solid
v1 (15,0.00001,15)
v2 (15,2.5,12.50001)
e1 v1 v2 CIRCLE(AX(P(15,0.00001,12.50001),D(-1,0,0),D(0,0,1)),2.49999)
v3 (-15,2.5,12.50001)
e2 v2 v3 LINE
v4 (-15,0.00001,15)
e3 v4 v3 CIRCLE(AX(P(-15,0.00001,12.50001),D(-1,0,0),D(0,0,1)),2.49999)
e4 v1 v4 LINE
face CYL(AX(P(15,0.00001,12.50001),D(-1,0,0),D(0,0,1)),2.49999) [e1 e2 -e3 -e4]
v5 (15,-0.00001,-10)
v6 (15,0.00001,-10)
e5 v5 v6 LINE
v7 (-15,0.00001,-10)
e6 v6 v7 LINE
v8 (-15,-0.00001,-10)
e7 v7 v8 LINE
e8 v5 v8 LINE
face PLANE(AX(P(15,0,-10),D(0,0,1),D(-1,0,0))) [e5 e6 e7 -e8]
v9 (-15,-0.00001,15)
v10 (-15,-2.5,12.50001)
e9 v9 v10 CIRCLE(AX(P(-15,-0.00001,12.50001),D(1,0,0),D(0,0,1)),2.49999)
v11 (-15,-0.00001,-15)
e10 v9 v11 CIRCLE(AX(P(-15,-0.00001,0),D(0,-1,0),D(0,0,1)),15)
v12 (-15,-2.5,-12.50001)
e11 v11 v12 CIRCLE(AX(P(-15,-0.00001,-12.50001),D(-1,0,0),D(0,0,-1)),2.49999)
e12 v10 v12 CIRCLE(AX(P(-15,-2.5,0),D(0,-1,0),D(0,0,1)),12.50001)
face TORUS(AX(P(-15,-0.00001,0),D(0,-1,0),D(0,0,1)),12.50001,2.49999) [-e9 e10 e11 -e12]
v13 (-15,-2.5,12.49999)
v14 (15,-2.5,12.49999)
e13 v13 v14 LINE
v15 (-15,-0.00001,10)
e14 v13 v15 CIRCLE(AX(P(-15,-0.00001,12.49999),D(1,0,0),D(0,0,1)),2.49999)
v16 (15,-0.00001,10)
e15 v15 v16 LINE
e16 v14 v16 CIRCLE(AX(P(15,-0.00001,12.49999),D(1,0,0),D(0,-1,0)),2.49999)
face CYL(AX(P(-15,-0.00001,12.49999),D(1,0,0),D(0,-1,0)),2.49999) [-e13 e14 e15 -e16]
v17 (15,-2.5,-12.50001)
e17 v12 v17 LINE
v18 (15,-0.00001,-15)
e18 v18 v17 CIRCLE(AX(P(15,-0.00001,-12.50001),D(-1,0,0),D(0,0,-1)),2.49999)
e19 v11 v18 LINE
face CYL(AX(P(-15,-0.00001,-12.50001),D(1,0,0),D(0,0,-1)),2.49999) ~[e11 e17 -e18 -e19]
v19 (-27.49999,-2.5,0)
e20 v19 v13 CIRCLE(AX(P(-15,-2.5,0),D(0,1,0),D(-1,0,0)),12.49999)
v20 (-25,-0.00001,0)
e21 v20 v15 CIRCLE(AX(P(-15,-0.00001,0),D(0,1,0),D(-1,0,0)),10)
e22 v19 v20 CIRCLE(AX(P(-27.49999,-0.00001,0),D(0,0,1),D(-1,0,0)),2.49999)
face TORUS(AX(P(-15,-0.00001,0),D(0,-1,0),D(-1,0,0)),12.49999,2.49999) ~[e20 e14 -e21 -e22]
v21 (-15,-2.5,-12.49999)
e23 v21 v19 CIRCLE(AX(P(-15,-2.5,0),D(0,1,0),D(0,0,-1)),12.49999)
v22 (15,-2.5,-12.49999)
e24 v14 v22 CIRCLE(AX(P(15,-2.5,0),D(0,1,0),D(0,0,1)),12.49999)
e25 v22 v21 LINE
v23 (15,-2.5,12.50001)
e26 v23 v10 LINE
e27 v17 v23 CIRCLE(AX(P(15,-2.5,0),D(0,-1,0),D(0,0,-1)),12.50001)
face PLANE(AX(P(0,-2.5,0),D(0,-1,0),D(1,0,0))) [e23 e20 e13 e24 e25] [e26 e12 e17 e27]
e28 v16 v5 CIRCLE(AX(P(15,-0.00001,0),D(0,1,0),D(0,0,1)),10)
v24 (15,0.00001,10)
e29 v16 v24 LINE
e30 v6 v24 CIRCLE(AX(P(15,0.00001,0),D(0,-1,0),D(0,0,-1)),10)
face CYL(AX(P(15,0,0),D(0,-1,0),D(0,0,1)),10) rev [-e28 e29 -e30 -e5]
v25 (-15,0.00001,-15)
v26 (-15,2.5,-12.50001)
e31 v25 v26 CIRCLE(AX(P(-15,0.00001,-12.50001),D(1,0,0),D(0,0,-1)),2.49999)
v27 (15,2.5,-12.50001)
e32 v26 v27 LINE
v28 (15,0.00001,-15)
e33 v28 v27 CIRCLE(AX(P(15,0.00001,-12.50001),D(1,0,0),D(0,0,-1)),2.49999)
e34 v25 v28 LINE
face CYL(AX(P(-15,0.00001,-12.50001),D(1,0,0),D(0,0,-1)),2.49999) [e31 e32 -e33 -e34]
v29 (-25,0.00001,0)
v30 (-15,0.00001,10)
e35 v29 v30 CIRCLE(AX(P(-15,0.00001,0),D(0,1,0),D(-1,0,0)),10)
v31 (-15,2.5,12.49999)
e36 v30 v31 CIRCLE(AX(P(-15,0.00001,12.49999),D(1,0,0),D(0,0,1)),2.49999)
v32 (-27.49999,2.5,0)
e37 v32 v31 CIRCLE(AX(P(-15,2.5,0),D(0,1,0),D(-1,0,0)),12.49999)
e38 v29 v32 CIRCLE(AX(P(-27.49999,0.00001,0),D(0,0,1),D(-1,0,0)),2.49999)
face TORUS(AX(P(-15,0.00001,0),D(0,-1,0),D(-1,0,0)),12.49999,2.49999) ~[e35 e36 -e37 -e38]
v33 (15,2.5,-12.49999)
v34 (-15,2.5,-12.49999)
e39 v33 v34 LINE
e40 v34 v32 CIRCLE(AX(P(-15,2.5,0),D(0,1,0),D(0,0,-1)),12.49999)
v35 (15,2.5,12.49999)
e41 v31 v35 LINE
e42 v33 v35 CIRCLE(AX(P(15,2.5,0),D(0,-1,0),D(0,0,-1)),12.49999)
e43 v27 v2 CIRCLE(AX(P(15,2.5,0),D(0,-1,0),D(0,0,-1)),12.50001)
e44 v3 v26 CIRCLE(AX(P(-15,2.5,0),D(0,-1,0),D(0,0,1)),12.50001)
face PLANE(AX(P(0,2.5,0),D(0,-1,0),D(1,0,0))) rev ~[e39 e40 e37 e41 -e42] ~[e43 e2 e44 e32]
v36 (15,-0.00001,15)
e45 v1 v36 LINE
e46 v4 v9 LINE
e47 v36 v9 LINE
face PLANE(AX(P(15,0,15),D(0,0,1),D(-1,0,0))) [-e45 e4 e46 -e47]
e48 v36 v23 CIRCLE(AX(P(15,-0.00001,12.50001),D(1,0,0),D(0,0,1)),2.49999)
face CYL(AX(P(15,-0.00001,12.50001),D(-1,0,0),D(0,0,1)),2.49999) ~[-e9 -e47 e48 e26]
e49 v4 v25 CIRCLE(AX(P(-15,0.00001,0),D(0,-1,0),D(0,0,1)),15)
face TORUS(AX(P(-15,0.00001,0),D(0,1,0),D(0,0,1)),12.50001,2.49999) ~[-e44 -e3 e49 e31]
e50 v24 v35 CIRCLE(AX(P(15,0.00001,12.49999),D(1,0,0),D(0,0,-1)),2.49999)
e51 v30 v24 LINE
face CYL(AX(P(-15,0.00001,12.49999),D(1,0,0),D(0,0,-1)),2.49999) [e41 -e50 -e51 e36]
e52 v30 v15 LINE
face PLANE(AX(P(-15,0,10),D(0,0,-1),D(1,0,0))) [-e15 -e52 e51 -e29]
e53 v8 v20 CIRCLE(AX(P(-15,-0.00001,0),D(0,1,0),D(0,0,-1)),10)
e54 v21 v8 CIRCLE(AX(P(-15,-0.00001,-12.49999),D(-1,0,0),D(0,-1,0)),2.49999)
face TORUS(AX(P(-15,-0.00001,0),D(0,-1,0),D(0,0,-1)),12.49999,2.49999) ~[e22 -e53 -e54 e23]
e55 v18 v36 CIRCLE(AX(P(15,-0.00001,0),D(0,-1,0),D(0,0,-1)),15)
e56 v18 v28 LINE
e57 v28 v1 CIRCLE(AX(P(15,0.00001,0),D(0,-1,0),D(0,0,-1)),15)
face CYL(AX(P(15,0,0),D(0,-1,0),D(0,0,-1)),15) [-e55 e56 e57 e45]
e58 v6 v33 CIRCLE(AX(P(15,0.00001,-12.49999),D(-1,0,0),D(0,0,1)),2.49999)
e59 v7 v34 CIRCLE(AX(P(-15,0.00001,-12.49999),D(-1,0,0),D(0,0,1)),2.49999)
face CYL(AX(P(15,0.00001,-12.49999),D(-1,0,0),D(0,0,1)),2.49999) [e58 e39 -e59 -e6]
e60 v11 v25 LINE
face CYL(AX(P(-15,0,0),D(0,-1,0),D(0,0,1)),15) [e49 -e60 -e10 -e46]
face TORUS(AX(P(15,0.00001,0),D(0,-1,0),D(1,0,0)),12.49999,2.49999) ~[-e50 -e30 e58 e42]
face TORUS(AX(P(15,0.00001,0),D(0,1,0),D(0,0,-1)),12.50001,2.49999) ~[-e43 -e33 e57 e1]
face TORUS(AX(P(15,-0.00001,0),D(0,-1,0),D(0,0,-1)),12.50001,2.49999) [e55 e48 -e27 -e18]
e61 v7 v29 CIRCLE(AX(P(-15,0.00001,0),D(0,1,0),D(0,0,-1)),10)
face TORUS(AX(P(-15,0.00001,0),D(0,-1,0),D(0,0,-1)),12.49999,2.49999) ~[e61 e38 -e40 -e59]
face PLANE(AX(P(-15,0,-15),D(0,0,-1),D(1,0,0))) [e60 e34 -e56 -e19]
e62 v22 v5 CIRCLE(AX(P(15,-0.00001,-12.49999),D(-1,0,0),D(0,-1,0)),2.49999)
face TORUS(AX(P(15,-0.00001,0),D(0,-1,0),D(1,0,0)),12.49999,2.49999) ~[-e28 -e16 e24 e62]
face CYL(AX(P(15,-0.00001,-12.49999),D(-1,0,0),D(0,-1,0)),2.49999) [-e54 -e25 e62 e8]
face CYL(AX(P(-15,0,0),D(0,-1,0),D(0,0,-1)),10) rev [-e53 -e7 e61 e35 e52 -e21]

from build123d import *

# Parameters (mm, degrees)
F1_DEPTH      = 2.5
F1_DEPTH_BACK = 2.5
F2_R          = 2.49999


# Not quite as in the source:
# - a fillet or chamfer is up to 0.001 mm smaller than in the source, because OpenCascade refuses the exact size


with BuildPart() as f1:
    # F0 (on Front) → F1 (new body, two sides)
    with BuildSketch(Plane.XZ) as f1_sk:
        with BuildLine():
            ThreePointArc((15, -15), (25.6066017178, -10.6066017178), (30, 0))
            ThreePointArc((30, 0), (25.6066017178, 10.6066017178), (15, 15))
            Line((15, 15), (-15, 15))
            ThreePointArc((-15, 15), (-25.6066017178, 10.6066017178), (-30, 0))
            ThreePointArc((-30, 0), (-25.6066017178, -10.6066017178), (-15, -15))
            Line((-15, -15), (15, -15))
        make_face()
        with BuildLine():
            ThreePointArc((25, 0), (22.0710678119, -7.0710678119), (15, -10))
            Line((15, -10), (-15, -10))
            ThreePointArc((-15, -10), (-22.0710678119, -7.0710678119), (-25, 0))
            ThreePointArc((-25, 0), (-22.0710678119, 7.0710678119), (-15, 10))
            Line((-15, 10), (15, 10))
            ThreePointArc((15, 10), (22.0710678119, 7.0710678119), (25, 0))
        make_face(mode=Mode.SUBTRACT)
    extrude(amount=F1_DEPTH)
    extrude(f1_sk.sketch, amount=-F1_DEPTH_BACK)

    # F2 (radius 2.5 in the source; OpenCascade refuses exactly that, so slightly less here)
    f2_edges = [f1.edges().sort_by_distance(p)[0] for p in [
        (0, -2.5, -15),
        (0, 2.5, -15),
        (0, -2.5, -10),
        (0, 2.5, -10),
    ]]
    fillet(f2_edges, radius=F2_R)


solid = f1.part
